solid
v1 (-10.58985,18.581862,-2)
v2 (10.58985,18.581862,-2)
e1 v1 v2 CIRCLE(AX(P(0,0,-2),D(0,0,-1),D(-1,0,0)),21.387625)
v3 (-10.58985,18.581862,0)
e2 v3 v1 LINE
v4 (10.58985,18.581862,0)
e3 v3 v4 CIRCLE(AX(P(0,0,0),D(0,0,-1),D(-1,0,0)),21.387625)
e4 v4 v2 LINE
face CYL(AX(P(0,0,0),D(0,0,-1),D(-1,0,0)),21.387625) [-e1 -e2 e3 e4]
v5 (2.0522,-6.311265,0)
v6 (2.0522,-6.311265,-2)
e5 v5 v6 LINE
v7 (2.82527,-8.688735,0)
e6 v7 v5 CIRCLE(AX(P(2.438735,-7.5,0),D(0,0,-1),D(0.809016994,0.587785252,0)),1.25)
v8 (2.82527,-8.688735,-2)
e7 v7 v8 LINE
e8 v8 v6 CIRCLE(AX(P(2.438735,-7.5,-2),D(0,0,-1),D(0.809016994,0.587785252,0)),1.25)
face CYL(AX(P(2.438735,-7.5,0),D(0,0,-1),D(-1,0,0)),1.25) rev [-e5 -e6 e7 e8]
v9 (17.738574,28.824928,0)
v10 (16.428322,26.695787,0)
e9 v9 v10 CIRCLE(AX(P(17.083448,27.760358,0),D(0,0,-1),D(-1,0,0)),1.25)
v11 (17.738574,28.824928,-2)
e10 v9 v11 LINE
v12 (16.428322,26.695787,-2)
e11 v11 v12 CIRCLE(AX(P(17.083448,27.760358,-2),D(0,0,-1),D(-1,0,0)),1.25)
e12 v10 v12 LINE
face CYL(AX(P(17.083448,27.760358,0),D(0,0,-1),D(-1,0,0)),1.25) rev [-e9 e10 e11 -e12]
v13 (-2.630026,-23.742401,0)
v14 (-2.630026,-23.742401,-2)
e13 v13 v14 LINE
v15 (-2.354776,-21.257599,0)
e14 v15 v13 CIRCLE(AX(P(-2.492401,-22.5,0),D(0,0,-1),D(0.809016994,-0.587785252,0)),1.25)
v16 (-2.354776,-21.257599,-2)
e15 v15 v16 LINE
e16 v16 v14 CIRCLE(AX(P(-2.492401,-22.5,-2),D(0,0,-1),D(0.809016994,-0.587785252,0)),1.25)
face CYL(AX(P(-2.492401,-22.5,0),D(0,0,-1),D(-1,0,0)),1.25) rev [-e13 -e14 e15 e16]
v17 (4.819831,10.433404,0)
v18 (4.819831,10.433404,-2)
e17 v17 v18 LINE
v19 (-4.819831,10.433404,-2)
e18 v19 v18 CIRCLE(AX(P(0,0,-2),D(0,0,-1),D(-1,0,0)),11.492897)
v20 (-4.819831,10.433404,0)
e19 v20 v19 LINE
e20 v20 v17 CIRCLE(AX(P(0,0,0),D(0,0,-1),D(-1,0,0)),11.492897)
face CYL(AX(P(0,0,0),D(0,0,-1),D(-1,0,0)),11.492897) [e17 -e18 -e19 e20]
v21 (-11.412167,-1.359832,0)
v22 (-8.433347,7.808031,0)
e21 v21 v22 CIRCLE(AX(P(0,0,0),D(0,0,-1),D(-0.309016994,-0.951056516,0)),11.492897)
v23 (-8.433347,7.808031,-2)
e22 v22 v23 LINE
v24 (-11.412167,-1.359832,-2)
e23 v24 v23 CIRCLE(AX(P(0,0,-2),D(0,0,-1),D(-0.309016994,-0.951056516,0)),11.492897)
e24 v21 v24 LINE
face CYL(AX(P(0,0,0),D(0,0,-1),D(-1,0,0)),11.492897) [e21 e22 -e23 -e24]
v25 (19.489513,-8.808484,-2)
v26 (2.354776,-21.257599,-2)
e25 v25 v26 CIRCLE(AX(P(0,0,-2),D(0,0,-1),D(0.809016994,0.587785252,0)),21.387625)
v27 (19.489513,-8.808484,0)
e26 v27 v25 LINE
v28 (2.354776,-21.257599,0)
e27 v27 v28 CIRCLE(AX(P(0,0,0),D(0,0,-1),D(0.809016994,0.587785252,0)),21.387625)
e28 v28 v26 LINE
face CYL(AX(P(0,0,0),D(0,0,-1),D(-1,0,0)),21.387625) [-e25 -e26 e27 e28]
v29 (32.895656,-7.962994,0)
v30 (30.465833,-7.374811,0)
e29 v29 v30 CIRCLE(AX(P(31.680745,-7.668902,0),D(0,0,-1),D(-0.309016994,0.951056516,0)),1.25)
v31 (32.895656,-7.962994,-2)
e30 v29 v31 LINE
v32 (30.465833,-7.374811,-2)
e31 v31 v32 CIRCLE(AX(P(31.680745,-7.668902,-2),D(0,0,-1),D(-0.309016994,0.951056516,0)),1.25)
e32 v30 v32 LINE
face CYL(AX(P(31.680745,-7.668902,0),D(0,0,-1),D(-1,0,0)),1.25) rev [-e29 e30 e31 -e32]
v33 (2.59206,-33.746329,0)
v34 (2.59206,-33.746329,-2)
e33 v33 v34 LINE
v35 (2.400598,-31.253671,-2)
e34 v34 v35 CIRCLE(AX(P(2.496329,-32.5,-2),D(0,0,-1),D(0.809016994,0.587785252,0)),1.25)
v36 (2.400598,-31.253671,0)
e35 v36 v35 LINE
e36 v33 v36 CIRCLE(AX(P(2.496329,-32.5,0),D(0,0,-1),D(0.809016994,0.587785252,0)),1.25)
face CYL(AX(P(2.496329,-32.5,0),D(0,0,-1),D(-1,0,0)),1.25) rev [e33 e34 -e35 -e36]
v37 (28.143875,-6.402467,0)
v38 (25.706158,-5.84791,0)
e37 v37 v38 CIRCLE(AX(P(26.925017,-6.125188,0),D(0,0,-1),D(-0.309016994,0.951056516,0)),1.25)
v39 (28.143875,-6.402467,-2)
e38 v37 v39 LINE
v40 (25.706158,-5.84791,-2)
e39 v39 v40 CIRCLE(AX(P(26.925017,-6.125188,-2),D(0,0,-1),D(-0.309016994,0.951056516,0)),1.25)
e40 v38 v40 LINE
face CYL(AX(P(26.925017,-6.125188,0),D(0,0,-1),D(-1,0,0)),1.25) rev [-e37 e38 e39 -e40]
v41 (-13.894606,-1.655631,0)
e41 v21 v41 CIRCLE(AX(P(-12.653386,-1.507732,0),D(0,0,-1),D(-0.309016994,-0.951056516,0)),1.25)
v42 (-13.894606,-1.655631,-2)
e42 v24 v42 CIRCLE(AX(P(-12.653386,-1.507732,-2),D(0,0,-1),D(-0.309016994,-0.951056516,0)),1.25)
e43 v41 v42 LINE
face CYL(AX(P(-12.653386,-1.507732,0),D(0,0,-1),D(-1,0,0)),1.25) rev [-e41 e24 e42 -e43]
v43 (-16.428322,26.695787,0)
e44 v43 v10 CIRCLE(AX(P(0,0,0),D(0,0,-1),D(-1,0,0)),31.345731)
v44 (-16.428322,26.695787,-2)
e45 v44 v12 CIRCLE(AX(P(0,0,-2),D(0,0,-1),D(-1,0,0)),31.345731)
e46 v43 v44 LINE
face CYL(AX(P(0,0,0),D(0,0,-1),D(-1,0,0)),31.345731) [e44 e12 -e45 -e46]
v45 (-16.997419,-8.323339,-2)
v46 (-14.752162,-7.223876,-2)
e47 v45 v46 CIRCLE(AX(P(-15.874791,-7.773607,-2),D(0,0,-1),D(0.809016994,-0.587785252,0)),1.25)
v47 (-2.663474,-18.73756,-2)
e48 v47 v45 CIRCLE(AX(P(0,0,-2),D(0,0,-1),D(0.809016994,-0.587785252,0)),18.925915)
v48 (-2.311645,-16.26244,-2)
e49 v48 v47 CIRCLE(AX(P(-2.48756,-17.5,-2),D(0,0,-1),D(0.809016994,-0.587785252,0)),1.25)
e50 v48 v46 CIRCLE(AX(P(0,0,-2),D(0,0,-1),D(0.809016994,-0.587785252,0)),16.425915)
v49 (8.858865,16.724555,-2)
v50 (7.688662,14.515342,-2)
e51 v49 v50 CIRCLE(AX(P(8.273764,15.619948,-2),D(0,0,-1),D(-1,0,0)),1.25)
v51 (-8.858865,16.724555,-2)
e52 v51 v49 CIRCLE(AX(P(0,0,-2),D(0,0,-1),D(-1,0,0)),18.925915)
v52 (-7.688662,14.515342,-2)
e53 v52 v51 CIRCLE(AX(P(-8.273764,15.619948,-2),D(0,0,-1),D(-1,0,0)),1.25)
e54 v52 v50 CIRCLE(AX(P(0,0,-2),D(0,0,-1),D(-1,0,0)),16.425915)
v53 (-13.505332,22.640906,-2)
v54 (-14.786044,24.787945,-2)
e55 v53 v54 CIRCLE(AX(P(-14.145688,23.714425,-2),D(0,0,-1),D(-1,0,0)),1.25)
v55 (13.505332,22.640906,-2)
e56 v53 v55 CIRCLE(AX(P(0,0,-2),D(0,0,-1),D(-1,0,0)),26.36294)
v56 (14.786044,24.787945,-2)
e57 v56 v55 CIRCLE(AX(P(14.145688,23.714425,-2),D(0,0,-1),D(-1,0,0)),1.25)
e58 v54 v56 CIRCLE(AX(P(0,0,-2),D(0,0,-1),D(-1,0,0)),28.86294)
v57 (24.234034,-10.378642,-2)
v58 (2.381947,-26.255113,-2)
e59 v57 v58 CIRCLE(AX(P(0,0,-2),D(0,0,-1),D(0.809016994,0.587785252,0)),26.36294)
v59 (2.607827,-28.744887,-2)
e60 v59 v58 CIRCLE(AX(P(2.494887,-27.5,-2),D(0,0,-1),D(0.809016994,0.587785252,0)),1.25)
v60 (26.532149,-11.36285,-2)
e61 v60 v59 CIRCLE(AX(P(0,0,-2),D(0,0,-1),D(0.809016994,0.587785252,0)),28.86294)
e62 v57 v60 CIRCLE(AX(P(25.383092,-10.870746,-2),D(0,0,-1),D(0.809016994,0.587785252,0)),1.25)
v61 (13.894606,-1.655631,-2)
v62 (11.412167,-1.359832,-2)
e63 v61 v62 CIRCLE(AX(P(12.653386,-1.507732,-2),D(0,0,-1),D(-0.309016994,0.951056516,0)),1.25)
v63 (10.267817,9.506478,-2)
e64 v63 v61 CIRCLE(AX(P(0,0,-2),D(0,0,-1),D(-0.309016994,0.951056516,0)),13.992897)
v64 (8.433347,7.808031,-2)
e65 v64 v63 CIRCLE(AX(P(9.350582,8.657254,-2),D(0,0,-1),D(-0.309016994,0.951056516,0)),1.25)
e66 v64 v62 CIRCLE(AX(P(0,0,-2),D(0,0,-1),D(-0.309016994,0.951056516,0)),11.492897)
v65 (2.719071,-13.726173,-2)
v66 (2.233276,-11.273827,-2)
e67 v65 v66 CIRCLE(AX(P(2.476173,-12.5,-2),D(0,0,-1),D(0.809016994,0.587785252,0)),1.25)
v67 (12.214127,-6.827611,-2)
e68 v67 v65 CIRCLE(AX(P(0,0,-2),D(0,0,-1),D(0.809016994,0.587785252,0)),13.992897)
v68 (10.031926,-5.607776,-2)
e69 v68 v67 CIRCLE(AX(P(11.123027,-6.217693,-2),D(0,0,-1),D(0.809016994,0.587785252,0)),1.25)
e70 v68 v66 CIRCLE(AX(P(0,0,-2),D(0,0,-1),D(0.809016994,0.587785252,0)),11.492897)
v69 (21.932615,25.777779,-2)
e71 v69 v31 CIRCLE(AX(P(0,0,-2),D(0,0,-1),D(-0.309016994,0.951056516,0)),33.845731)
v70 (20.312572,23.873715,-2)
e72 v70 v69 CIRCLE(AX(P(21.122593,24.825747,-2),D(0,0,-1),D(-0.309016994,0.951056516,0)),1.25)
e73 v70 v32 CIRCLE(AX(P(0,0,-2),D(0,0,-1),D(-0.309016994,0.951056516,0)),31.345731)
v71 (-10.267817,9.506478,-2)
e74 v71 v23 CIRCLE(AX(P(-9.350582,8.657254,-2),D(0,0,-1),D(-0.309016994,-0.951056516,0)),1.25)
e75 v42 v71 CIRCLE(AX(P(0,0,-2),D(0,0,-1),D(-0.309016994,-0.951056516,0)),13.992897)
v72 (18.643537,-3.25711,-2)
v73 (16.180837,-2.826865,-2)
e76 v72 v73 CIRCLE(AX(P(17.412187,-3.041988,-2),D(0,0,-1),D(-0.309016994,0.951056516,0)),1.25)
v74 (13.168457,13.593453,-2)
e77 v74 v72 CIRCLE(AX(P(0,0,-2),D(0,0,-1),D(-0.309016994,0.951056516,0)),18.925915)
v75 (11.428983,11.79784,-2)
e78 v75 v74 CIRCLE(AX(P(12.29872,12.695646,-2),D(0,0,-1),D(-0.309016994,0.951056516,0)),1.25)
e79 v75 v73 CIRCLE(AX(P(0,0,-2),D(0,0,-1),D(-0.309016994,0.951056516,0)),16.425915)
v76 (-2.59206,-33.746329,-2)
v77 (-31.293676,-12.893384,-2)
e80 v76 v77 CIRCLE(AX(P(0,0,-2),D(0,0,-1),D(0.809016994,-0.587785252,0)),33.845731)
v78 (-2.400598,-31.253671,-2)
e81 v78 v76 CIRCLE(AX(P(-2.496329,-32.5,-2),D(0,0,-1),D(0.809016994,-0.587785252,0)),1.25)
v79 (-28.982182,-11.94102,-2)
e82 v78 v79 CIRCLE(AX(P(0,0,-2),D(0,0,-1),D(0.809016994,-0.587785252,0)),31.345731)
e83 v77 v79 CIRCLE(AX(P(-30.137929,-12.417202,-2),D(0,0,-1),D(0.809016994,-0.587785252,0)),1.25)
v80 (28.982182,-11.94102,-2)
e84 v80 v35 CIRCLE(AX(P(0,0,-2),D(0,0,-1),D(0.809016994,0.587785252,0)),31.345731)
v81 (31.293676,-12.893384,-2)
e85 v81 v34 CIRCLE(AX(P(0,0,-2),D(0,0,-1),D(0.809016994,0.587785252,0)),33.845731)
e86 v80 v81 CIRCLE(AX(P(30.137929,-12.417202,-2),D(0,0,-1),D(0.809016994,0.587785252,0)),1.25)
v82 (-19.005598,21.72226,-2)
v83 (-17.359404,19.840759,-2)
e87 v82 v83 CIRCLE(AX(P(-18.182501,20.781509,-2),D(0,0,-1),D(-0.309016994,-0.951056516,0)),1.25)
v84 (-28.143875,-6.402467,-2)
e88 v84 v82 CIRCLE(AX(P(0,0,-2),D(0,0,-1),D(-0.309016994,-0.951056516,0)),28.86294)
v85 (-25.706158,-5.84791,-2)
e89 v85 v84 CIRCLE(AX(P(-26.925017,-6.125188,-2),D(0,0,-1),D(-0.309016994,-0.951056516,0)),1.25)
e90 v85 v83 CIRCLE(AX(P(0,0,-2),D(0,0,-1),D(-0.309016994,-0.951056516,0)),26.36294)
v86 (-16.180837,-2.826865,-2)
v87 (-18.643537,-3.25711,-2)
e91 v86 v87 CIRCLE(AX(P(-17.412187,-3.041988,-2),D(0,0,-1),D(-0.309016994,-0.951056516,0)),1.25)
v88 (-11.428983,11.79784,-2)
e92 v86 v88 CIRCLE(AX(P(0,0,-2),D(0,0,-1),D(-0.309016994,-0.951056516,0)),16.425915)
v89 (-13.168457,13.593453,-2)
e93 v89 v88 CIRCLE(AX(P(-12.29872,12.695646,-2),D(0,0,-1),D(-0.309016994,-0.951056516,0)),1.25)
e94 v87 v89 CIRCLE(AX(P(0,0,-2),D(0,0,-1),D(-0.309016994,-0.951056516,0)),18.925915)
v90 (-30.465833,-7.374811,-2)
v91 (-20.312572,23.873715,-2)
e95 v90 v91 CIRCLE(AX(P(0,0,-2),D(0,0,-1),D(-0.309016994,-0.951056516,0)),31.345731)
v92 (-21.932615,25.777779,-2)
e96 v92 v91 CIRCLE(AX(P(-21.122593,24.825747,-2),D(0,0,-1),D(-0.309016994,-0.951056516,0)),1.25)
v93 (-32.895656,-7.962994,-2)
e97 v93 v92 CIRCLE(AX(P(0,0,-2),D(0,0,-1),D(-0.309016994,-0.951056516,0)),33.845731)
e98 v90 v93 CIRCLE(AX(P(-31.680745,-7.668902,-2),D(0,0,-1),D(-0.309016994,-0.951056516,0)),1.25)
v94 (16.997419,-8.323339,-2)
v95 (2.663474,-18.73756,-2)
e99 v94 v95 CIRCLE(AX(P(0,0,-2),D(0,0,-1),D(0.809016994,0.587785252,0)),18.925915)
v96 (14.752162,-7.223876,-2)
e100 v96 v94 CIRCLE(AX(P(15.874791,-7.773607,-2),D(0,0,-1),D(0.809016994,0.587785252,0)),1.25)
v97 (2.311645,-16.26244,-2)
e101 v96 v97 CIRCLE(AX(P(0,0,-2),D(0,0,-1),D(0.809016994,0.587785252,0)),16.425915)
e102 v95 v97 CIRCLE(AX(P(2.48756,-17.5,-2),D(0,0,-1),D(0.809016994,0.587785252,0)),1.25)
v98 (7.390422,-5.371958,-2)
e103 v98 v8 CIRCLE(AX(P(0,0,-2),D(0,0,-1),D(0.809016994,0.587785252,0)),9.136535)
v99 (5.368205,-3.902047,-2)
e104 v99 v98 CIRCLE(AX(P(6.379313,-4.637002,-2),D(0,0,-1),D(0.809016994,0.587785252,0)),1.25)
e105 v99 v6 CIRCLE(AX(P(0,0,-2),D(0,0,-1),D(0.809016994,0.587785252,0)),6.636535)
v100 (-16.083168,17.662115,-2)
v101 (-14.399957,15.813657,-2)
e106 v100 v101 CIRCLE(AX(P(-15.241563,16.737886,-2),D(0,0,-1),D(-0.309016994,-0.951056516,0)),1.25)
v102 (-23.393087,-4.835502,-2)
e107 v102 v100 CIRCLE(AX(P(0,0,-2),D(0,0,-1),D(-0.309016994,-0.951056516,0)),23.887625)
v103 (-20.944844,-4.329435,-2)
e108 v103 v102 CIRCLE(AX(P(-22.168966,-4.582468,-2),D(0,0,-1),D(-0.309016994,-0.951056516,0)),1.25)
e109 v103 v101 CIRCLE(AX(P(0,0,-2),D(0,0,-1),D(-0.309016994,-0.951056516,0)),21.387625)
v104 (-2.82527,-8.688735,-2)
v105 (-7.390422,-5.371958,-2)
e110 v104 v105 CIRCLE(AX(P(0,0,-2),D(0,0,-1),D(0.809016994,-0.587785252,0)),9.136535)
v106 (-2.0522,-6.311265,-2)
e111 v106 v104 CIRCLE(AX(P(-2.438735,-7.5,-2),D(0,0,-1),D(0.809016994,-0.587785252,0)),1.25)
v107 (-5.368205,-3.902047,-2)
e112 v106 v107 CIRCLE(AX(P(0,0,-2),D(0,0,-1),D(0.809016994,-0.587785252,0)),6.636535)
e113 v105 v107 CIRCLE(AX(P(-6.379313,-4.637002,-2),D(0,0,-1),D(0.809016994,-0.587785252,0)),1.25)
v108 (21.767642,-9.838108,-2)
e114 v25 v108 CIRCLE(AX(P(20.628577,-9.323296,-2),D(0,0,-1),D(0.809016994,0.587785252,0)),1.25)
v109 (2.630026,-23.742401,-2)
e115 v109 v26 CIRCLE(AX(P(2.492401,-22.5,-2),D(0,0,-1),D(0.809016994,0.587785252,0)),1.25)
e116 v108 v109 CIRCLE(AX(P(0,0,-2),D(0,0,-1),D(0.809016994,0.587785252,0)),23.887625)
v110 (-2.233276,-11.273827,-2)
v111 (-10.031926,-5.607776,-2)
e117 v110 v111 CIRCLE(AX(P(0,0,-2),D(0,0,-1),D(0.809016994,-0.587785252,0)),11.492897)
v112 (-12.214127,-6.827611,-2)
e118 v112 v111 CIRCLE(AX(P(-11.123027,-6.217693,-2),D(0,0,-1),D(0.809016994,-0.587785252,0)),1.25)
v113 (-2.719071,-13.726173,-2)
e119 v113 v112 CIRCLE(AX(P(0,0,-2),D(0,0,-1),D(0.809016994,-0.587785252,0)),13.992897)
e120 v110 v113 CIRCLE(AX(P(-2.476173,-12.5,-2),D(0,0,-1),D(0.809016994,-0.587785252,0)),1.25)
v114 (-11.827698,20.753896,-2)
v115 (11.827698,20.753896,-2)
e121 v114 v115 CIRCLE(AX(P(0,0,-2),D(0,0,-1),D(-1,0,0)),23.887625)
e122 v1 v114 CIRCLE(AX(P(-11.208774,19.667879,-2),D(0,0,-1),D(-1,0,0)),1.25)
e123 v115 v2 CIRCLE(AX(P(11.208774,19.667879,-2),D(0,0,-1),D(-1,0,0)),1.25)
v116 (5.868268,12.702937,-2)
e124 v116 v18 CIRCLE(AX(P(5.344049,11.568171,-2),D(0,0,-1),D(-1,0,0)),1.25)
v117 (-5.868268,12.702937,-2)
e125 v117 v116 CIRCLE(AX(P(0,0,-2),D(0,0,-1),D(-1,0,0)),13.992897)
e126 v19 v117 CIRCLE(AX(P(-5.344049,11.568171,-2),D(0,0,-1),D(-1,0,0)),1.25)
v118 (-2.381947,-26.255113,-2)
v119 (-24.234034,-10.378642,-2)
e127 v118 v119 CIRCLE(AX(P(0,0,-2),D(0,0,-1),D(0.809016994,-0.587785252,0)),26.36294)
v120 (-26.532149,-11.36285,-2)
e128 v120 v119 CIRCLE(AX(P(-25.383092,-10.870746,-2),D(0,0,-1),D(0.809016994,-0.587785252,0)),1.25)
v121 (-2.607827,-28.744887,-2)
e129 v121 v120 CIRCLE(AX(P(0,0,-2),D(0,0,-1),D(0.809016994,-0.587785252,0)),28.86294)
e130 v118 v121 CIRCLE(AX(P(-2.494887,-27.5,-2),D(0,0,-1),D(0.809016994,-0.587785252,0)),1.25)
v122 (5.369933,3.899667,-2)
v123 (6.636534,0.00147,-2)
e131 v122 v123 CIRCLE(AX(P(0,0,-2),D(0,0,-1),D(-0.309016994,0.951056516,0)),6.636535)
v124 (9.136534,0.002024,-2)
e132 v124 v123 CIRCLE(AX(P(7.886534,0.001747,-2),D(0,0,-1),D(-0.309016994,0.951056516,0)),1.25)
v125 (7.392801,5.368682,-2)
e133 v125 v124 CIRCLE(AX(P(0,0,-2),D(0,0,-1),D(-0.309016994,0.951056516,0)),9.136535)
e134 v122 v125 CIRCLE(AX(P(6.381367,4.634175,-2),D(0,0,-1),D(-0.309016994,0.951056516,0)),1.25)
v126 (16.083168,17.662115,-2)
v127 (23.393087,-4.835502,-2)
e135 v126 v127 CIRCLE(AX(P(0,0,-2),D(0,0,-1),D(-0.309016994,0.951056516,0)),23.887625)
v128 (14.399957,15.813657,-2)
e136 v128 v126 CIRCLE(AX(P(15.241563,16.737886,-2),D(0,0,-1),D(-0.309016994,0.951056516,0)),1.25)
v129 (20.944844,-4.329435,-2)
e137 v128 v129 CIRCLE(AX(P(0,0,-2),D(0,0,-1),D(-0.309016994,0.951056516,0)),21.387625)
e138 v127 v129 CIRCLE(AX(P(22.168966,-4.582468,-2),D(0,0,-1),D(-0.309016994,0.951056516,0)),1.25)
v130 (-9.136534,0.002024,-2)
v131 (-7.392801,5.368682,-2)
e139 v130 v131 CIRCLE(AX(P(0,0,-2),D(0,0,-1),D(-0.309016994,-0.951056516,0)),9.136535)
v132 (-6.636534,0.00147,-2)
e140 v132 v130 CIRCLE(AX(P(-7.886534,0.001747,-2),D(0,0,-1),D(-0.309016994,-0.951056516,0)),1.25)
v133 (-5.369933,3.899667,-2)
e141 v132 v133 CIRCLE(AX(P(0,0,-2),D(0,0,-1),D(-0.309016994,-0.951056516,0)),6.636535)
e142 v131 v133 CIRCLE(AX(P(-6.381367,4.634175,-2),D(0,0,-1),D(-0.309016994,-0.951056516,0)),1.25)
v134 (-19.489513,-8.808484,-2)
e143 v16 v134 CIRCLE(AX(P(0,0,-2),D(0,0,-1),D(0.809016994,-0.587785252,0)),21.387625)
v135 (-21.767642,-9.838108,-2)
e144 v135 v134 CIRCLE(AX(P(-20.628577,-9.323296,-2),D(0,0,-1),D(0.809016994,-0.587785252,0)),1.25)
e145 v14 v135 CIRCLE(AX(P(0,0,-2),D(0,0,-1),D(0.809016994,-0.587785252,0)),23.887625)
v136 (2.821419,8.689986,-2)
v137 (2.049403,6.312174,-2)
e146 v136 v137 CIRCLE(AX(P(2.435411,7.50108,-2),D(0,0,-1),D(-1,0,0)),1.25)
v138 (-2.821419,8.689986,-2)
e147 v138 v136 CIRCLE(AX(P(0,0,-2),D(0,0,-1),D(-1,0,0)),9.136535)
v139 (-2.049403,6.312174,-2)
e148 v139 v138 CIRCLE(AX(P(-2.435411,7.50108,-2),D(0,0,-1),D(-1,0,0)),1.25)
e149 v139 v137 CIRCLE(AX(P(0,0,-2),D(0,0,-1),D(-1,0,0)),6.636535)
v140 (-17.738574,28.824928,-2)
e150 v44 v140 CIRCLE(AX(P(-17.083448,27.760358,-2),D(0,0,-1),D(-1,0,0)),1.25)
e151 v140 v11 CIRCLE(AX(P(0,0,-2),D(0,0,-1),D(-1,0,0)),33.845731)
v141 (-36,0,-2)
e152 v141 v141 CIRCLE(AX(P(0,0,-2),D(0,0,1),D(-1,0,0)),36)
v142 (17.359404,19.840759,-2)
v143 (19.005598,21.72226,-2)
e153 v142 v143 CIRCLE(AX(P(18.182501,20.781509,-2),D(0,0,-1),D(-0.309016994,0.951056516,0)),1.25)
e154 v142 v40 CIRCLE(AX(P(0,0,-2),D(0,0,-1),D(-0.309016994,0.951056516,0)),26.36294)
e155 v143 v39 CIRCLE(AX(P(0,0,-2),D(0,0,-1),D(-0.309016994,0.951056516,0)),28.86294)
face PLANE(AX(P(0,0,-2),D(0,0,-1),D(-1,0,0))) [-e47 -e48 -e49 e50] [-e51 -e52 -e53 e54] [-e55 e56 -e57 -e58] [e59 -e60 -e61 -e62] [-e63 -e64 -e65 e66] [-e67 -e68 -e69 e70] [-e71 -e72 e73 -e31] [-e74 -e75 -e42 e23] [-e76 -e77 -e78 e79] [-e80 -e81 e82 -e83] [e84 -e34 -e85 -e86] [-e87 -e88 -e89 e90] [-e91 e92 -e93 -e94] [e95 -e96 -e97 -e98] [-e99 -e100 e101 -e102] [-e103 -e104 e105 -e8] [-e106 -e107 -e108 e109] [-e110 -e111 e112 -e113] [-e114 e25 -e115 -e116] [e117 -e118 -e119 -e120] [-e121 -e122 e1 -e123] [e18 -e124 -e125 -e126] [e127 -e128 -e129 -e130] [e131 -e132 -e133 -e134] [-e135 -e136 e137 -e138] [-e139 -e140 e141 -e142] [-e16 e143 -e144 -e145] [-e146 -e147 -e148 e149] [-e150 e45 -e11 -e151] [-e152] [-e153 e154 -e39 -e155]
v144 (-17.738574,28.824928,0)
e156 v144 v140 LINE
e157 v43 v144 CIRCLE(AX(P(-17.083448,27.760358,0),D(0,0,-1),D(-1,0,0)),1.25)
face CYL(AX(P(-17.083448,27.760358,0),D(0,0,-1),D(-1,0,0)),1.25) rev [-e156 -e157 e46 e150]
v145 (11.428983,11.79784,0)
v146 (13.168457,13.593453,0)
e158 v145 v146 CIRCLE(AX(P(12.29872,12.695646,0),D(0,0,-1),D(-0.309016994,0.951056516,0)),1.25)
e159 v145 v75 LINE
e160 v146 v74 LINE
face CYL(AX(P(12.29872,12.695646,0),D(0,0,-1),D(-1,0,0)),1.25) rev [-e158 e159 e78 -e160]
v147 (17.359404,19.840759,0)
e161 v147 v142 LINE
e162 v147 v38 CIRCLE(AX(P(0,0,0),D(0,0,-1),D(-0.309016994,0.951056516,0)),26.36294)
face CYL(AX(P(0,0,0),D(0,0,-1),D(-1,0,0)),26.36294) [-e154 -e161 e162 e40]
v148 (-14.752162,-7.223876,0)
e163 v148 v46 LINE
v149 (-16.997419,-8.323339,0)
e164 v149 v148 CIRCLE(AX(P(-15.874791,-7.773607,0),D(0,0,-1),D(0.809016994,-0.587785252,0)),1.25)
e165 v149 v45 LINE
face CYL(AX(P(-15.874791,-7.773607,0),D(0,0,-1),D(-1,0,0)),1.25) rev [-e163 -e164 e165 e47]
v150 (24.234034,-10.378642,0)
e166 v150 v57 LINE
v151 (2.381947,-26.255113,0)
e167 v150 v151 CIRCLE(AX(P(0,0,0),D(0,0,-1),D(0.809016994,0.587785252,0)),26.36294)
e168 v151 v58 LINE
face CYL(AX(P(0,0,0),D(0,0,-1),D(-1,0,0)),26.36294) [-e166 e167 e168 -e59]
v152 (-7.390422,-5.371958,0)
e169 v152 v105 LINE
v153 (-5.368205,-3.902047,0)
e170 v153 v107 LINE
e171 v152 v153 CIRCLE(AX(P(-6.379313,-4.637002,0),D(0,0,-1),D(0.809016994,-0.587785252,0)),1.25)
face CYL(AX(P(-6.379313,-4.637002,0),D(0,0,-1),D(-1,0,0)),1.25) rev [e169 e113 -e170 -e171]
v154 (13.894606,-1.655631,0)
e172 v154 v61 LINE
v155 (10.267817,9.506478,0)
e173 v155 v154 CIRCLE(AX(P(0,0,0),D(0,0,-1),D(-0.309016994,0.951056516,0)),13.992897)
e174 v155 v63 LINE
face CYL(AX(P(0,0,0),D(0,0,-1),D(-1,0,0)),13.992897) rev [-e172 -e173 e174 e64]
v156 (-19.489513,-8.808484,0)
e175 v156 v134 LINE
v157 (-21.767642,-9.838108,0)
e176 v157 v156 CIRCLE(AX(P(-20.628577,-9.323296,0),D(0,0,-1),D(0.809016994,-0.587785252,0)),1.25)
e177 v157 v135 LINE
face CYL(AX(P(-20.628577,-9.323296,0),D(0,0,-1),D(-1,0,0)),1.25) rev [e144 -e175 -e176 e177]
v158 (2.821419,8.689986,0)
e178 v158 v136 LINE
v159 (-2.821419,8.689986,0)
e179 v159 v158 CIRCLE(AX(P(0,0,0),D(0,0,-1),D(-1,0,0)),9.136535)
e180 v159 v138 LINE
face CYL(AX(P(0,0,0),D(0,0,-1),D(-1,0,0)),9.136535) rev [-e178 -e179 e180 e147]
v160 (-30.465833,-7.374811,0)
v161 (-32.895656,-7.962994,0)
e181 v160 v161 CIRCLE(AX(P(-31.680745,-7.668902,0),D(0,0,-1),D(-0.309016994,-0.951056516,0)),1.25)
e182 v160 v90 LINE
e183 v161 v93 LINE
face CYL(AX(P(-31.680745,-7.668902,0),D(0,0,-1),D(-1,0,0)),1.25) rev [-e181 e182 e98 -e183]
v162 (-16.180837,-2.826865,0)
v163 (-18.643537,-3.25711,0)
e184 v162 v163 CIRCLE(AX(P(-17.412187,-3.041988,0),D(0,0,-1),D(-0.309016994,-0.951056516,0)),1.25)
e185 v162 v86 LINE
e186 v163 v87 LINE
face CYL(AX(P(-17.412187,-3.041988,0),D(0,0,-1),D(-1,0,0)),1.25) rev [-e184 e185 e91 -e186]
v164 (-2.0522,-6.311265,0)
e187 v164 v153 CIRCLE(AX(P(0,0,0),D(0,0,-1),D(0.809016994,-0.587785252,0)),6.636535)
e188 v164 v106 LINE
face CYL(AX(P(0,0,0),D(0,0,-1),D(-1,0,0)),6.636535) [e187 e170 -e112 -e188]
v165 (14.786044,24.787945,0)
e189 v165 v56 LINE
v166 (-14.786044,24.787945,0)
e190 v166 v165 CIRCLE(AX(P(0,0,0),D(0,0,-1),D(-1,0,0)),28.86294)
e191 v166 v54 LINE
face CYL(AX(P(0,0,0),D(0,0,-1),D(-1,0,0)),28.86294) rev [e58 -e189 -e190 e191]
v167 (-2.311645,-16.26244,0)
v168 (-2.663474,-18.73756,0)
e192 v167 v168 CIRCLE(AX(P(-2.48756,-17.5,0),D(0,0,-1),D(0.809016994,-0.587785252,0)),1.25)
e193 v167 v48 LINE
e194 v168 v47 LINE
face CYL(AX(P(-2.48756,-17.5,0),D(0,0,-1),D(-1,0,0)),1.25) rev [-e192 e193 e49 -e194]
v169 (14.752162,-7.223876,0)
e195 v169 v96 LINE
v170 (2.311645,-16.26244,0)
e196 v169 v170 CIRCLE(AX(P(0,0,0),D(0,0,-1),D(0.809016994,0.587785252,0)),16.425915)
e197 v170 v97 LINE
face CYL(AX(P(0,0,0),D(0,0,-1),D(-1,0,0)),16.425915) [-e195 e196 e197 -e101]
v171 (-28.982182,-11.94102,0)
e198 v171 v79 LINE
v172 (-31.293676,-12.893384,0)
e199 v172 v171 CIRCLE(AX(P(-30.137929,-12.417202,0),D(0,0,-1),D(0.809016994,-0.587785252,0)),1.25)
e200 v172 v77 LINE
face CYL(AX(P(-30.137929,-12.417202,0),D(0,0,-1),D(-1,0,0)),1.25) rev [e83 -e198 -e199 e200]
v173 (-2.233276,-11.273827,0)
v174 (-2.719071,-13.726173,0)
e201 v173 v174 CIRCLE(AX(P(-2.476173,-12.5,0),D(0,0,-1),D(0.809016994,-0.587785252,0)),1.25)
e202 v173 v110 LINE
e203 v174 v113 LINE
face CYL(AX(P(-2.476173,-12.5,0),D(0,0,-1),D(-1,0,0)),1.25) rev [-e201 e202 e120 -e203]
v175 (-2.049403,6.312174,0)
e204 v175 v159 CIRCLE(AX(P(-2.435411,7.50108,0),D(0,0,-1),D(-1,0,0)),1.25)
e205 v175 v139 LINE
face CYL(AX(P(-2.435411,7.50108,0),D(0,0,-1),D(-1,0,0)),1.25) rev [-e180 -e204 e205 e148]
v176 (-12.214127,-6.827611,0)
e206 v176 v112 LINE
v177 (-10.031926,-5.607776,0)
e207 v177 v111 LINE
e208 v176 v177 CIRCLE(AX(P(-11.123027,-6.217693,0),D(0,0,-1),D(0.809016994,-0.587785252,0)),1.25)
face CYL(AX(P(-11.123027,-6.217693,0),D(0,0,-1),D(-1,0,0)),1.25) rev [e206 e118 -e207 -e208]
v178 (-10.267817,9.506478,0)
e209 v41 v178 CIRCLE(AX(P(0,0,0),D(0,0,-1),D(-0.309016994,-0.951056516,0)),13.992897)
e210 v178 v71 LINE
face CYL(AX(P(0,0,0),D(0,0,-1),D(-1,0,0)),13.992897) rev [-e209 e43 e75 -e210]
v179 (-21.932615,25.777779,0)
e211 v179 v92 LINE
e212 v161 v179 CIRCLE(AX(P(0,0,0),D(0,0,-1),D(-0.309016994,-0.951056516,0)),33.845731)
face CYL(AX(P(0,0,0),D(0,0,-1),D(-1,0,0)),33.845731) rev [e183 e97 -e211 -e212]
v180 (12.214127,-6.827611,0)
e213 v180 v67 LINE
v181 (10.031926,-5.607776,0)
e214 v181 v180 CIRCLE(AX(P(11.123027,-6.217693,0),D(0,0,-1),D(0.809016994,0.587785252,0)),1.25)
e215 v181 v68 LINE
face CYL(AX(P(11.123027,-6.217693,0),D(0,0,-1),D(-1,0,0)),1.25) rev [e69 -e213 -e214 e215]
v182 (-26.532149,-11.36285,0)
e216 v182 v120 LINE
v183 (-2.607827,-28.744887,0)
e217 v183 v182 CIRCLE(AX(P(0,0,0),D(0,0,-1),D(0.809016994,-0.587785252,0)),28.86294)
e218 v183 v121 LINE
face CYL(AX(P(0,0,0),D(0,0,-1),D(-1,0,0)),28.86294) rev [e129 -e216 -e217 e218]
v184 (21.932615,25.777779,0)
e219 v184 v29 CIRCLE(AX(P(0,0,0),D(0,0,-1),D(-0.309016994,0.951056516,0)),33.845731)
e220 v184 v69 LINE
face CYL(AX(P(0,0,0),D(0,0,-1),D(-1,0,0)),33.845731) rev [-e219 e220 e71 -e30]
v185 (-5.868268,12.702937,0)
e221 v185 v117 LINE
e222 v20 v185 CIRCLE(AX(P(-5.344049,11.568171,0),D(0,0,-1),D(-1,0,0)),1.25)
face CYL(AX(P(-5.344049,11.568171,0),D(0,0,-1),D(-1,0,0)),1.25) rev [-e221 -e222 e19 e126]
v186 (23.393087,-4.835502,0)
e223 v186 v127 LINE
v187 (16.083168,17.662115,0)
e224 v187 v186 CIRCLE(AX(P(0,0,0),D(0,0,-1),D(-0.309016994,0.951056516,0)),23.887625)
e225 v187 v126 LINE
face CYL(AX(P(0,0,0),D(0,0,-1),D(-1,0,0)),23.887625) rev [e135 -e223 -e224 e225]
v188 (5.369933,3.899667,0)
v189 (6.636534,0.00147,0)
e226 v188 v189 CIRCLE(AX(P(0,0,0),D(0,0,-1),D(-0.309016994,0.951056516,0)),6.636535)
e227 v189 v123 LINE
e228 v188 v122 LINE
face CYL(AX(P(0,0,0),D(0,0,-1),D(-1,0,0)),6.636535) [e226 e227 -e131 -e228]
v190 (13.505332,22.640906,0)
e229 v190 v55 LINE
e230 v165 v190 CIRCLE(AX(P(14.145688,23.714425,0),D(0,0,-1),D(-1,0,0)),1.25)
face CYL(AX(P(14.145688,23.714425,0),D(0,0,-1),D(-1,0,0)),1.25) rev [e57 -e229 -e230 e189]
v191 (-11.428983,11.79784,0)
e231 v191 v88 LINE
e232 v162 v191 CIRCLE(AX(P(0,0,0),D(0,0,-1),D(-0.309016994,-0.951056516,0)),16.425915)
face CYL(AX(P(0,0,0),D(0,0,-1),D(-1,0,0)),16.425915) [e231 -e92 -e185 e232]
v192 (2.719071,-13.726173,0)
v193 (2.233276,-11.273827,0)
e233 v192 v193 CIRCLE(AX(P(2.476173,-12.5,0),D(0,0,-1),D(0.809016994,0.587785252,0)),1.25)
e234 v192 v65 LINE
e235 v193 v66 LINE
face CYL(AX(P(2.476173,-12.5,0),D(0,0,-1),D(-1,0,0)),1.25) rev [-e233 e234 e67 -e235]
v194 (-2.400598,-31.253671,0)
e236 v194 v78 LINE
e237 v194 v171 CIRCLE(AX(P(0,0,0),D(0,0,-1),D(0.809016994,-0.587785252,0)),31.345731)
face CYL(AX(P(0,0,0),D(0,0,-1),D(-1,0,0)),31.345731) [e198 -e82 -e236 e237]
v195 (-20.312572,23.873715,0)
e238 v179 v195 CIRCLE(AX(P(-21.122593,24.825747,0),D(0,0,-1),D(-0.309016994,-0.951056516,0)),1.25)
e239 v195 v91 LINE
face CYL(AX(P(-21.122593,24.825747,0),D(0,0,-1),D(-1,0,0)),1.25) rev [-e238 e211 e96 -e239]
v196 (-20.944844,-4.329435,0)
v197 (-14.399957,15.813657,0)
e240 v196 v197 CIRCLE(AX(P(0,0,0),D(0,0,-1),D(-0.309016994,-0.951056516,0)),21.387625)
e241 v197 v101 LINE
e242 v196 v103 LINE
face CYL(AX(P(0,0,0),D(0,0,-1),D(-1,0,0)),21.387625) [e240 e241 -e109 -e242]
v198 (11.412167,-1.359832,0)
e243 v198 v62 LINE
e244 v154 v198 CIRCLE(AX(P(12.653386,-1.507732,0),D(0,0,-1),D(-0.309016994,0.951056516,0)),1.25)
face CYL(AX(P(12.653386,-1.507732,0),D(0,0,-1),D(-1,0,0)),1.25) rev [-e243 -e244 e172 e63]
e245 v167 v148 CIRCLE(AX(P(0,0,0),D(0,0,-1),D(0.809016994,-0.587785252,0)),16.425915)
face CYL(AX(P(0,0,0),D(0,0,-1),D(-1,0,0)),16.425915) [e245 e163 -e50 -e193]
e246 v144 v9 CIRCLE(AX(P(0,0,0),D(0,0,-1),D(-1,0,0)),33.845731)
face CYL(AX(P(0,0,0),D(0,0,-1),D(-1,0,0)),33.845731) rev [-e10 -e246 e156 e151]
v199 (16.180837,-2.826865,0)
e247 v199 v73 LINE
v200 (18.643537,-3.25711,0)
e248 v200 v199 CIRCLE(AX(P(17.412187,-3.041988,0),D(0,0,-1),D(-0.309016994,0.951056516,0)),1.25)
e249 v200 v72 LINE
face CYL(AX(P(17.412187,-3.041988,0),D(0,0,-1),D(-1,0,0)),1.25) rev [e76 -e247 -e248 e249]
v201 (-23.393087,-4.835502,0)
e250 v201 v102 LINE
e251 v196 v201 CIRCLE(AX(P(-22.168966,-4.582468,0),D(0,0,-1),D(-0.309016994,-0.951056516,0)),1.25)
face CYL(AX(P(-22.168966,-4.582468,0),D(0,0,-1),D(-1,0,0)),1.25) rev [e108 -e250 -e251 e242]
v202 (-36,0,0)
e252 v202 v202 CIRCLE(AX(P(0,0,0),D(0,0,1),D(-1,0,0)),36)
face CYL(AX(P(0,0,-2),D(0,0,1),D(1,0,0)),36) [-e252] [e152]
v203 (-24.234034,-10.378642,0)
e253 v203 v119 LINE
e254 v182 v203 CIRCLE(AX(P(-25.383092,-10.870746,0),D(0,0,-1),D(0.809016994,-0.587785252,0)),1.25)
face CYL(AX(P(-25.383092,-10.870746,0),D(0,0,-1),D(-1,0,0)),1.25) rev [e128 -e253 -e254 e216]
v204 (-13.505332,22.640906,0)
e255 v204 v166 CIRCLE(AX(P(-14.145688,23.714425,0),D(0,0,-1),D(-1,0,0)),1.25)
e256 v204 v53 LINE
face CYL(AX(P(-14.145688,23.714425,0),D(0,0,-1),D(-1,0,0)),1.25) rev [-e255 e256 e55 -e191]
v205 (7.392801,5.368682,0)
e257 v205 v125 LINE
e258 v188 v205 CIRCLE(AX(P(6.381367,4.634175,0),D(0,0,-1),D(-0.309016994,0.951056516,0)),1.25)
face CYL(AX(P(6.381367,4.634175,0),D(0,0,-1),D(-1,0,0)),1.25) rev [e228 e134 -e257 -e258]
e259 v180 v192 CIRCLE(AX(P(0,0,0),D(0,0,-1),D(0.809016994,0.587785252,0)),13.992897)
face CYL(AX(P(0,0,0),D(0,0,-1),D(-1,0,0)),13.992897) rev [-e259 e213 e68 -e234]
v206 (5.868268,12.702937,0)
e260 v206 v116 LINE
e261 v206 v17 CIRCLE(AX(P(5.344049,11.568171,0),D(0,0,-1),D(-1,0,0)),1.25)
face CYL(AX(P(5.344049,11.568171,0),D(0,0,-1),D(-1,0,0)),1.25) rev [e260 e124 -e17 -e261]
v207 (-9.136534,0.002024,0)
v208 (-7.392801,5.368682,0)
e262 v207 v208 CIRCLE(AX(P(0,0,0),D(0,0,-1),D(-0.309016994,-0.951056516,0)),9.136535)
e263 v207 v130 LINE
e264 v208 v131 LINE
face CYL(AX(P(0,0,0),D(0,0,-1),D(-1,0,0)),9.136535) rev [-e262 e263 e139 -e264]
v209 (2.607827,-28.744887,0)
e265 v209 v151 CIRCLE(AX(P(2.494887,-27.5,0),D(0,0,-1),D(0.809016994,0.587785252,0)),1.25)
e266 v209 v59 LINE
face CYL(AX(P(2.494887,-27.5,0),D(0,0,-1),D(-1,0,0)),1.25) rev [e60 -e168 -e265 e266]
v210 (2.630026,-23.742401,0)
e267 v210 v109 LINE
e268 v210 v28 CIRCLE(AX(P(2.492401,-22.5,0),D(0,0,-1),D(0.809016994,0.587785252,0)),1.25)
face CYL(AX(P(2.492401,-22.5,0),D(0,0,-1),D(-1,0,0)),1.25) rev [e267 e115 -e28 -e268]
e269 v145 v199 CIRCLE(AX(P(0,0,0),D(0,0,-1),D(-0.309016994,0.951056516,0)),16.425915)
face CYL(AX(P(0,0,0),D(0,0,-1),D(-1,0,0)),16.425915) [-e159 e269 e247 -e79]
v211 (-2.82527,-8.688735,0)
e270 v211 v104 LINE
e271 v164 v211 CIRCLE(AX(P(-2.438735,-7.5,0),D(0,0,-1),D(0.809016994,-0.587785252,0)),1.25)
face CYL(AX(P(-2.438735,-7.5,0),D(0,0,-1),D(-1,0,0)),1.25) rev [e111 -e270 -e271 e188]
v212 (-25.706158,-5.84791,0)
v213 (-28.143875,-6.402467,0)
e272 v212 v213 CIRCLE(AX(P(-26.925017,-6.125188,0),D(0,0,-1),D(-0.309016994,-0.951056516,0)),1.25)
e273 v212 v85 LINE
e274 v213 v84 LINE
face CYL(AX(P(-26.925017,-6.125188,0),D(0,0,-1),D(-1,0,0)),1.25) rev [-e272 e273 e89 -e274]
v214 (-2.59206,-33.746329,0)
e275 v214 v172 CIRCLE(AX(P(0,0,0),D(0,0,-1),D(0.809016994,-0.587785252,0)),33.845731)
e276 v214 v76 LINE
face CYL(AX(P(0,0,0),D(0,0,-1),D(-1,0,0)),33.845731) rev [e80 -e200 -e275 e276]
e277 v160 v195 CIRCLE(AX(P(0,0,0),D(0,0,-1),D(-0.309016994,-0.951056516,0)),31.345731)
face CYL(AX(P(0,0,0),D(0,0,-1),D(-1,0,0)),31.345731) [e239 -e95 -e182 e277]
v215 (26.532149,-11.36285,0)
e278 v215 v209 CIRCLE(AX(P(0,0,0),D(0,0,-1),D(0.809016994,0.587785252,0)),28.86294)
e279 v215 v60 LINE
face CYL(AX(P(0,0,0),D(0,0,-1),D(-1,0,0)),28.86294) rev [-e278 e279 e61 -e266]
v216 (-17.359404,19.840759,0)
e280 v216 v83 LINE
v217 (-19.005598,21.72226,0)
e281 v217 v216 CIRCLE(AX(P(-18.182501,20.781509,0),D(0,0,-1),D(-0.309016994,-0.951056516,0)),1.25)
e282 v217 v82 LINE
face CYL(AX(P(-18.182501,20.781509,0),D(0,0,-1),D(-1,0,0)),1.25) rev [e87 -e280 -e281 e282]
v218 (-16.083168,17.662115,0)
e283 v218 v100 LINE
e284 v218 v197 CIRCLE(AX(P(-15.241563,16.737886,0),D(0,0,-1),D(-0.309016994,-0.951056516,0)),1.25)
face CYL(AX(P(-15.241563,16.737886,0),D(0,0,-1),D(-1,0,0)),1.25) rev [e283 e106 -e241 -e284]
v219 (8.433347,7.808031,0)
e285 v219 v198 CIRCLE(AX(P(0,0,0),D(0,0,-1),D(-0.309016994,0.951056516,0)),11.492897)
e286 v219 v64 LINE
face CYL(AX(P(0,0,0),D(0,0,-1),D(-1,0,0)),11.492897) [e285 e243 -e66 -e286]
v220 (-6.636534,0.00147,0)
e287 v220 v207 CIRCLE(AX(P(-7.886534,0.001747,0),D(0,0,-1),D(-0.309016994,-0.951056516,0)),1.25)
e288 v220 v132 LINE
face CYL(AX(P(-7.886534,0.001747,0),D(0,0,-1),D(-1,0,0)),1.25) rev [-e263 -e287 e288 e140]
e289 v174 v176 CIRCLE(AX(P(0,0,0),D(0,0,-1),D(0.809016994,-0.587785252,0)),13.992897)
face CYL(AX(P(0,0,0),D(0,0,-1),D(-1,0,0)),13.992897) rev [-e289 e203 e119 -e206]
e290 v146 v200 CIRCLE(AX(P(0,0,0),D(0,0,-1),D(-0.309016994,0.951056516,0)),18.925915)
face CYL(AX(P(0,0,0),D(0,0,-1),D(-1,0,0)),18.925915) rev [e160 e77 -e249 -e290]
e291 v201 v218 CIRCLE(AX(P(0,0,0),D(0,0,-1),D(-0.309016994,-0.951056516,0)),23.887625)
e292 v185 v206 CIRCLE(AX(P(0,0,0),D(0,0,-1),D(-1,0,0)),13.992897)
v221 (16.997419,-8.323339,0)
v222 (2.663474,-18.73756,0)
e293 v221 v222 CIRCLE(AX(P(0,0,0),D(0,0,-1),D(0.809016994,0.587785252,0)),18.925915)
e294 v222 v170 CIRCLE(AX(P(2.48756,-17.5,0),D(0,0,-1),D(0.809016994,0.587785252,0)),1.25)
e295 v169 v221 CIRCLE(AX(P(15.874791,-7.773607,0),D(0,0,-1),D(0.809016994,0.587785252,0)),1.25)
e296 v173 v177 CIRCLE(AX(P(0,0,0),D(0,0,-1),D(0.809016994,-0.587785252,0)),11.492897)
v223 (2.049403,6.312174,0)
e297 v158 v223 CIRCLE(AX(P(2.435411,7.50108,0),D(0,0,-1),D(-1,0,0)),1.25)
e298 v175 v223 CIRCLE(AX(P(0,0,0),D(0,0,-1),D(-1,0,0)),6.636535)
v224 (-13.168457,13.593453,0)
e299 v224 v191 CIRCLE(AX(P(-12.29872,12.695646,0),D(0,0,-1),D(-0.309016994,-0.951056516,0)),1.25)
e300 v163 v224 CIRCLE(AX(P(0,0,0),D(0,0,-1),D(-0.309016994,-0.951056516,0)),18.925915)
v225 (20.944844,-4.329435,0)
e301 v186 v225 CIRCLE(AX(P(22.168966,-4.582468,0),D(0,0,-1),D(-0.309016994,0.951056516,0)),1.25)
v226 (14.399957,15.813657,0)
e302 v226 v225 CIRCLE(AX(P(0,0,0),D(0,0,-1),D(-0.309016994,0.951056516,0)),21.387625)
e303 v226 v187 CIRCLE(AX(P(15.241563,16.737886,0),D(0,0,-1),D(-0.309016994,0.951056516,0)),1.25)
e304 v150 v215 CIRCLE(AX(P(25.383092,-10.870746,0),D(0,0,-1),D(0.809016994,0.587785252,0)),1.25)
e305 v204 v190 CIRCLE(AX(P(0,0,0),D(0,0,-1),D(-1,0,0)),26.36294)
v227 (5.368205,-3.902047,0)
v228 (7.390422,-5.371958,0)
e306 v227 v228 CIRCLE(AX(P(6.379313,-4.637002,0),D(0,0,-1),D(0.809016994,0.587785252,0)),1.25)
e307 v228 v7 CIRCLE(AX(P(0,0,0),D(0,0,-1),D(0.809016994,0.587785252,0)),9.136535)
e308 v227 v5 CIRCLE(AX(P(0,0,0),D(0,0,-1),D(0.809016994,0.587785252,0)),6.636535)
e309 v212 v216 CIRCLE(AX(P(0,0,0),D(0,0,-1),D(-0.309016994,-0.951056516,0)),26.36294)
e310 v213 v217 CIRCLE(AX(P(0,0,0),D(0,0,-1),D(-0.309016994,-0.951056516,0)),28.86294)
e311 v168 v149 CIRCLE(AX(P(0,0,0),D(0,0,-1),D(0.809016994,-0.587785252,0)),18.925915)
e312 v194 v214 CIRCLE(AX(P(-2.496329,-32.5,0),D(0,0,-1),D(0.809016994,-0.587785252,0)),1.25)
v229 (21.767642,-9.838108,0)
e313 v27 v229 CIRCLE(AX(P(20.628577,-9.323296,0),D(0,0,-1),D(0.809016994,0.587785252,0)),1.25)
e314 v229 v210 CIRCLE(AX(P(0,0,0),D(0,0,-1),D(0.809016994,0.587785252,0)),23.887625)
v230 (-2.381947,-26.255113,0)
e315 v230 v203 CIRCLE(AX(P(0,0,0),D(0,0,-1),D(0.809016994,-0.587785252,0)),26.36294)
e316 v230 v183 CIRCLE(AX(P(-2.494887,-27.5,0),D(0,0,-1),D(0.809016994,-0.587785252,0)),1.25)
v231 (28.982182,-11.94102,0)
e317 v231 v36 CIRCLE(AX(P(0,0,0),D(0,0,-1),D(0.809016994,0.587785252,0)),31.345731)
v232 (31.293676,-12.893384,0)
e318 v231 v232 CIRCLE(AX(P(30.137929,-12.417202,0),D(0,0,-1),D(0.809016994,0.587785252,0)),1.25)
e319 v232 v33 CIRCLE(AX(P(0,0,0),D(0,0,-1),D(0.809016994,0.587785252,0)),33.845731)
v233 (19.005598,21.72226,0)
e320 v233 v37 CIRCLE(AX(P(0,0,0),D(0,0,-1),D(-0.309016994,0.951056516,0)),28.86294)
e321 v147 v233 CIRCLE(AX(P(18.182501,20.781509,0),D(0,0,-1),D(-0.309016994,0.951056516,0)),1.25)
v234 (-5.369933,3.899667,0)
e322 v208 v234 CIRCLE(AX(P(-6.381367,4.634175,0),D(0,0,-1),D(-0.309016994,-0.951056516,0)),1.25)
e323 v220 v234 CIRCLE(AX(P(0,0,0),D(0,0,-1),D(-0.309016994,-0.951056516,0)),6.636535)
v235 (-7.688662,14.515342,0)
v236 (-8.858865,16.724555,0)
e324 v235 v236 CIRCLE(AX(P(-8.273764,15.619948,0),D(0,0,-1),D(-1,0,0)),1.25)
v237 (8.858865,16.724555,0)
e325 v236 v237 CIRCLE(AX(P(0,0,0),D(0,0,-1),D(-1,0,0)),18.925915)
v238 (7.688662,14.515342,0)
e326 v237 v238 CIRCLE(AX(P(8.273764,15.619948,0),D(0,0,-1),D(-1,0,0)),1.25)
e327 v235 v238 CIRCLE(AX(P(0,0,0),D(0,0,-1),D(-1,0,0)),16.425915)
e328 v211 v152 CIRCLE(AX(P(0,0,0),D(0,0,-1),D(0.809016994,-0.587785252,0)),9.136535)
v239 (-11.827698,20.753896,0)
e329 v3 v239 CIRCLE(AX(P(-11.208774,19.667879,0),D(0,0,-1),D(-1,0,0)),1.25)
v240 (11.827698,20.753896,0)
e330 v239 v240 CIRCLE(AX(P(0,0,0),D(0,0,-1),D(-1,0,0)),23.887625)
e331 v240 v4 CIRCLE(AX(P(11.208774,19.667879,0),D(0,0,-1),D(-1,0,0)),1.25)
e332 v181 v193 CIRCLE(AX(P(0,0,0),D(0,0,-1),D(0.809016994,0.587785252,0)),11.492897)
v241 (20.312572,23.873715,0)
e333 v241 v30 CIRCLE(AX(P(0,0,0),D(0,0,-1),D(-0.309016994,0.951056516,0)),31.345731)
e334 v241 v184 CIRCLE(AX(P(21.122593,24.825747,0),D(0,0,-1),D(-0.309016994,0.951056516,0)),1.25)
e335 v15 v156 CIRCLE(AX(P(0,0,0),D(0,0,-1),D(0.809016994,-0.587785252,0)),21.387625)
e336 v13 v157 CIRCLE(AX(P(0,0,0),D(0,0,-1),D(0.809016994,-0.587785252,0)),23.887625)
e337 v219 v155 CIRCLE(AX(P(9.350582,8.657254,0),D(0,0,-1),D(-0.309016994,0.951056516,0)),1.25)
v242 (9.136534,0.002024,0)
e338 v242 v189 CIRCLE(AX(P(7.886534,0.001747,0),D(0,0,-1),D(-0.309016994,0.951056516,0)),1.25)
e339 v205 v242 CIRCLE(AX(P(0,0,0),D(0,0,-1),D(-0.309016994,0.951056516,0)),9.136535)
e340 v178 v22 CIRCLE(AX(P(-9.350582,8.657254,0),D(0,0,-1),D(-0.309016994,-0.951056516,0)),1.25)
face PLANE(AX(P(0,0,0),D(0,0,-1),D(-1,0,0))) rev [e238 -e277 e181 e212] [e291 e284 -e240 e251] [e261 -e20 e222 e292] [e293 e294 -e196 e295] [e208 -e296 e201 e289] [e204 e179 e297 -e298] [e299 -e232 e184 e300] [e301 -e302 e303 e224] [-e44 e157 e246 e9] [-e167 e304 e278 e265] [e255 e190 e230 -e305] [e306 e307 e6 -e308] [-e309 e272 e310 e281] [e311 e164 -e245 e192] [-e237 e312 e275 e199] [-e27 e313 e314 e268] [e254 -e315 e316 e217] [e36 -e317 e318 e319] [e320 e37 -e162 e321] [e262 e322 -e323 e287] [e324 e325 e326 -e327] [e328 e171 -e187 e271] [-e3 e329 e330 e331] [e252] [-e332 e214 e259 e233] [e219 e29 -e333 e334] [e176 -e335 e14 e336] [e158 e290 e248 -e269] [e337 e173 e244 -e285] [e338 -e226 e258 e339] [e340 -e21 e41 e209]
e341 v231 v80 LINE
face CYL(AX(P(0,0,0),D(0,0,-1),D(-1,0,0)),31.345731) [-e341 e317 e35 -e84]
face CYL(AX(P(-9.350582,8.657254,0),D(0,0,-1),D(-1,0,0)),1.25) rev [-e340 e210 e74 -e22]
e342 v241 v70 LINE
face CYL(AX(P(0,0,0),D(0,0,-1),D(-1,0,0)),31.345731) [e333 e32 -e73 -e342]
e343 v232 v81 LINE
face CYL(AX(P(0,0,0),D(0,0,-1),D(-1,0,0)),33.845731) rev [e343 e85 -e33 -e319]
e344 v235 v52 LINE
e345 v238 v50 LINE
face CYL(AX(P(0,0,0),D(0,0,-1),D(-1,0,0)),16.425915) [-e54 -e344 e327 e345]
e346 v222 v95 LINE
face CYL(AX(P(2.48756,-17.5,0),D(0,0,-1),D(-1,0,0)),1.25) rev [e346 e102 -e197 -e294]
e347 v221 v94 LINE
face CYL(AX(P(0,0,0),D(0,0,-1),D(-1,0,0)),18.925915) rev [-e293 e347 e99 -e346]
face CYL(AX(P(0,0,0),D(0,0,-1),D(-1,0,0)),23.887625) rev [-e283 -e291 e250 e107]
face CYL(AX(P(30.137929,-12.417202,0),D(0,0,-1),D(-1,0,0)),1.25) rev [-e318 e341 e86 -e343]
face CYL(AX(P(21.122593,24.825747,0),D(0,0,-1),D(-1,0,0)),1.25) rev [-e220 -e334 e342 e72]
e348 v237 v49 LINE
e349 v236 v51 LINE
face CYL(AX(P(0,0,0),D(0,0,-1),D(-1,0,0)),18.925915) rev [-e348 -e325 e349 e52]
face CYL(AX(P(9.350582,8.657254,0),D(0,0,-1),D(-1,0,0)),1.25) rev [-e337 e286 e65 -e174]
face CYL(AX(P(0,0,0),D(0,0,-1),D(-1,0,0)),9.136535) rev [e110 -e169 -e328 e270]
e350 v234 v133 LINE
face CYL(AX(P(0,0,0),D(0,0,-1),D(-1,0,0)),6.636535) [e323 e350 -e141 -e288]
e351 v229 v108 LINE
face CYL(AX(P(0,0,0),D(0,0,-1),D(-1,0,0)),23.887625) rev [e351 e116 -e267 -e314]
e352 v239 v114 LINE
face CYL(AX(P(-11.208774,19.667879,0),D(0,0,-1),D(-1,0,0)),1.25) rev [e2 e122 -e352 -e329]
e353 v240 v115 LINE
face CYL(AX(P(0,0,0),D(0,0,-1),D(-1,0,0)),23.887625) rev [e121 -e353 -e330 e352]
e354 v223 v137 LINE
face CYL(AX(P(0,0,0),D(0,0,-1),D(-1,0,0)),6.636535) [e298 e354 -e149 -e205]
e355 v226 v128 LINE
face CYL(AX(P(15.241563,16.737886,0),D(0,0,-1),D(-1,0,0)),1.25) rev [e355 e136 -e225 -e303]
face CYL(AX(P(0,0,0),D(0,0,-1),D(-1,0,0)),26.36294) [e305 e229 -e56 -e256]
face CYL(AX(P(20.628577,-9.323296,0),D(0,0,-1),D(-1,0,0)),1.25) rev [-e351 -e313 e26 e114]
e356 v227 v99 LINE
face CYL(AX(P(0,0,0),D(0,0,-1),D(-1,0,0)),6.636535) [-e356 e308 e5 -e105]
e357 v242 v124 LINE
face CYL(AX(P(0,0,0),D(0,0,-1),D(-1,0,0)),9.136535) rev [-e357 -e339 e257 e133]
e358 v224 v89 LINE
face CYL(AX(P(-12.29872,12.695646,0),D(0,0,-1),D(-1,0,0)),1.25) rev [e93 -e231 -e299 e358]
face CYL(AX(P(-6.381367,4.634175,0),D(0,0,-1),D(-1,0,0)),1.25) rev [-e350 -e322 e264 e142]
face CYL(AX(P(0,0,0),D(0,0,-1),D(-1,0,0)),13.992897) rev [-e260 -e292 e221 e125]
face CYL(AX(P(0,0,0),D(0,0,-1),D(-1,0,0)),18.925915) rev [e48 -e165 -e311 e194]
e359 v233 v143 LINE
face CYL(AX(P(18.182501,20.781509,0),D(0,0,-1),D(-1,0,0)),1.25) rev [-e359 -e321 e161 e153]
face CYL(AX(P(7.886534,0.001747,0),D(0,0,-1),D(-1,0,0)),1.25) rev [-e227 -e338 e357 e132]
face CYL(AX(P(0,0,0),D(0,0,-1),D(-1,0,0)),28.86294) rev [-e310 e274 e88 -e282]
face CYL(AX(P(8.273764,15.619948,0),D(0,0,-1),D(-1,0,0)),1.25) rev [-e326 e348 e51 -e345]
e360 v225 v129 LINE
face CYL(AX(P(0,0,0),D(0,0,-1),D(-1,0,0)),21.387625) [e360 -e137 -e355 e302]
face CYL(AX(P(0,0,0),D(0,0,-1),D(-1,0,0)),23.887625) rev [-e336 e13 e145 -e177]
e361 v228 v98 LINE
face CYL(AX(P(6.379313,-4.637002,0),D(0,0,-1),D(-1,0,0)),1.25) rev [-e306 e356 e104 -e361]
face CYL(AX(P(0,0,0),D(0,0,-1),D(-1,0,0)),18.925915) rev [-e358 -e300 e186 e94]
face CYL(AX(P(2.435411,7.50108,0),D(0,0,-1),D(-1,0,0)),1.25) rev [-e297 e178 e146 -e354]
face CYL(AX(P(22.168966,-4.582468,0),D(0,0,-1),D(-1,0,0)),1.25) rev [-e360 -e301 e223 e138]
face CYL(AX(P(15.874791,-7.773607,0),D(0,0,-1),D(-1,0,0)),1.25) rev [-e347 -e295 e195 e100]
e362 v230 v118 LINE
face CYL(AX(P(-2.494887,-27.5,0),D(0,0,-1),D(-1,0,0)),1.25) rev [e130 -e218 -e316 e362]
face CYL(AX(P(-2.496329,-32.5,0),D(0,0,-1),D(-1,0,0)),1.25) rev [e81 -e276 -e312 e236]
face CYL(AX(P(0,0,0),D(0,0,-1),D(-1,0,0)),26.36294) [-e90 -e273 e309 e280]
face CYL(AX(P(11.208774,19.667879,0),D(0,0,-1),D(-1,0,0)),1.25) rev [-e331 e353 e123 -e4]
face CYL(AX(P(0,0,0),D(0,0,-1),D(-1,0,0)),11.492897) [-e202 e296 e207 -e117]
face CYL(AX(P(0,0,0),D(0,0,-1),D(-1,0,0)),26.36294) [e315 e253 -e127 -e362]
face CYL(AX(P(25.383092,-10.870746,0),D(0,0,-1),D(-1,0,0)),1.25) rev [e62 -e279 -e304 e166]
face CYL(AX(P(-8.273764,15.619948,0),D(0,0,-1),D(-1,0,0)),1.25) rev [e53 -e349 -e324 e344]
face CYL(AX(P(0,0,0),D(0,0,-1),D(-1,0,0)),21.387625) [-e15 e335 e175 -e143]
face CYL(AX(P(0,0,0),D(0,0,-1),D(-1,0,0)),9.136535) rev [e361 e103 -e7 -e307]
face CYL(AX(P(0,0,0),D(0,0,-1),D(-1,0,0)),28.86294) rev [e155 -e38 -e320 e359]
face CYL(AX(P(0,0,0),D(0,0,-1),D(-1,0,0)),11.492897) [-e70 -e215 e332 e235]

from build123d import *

# Parameters (mm, degrees)
EXTRUDE_1_DEPTH          = 2
CUT_EXTRUDE_1_DEPTH      = 2
PATTERN_START            = -2
PATTERN_LINEAR_1_DEPTH   = 2
PATTERN_CIRCULAR_2_COUNT = 5


# Read off the part's stored shape, not the designer's step: Линейный массив1
with BuildPart() as part:
    # Эскиз1 → Бобышка-Вытянуть1 (new body)
    with BuildSketch(Plane.XY):
        with BuildLine():
            Line((-21.160269083, 29.124611797), (0, 0))
            Line((0, 0), (21.160269083, 29.124611797))
            ThreePointArc((21.160269083, 29.124611797), (0, 36), (-21.160269083, 29.124611797))
        make_face()
    extrude_1 = extrude(amount=-EXTRUDE_1_DEPTH)

    # Эскиз3 → Вырез-Вытянуть1 (cut)
    with BuildSketch(Plane(origin=(0, 0, -2), x_dir=(-1, 0, 0), z_dir=(0, 0, -1))):
        with BuildLine():
            ThreePointArc((2.821419138, 8.689986144), (0, 9.136534635), (-2.821419138, 8.689986144))
            ThreePointArc((-2.821419138, 8.689986144), (-3.624317507, 7.115072112), (-2.049403475, 6.312173743))
            ThreePointArc((-2.049403475, 6.312173743), (0, 6.636534635), (2.049403475, 6.312173743))
            ThreePointArc((2.049403475, 6.312173743), (3.624317507, 7.115072112), (2.821419138, 8.689986144))
        make_face()
    cut_extrude_1 = extrude(amount=-CUT_EXTRUDE_1_DEPTH, mode=Mode.SUBTRACT)

    # Линейный массив1 outline → Линейный массив1 (cut)
    with BuildSketch(Plane.XY.offset(PATTERN_START)):
        with BuildLine():
            ThreePointArc((-5.868267845, 12.702937061), (-6.478815917, 11.043952114), (-4.81983097, 10.433404043))
            ThreePointArc((-4.81983097, 10.433404043), (0, 11.492897394), (4.81983097, 10.433404043))
            ThreePointArc((4.81983097, 10.433404043), (6.478815917, 11.043952114), (5.868267845, 12.702937061))
            ThreePointArc((5.868267845, 12.702937061), (0, 13.992897394), (-5.868267845, 12.702937061))
        make_face()
        with BuildLine():
            ThreePointArc((-14.786044108, 24.78794491), (-15.219207741, 23.074069399), (-13.50533223, 22.640905767))
            ThreePointArc((-13.50533223, 22.640905767), (0, 26.362940135), (13.50533223, 22.640905767))
            ThreePointArc((13.50533223, 22.640905767), (15.219207741, 23.074069399), (14.786044108, 24.78794491))
            ThreePointArc((14.786044108, 24.78794491), (0, 28.862940135), (-14.786044108, 24.78794491))
        make_face()
        with BuildLine():
            ThreePointArc((-17.738574213, 28.824927916), (-18.148018532, 27.10523162), (-16.428322236, 26.695787302))
            ThreePointArc((-16.428322236, 26.695787302), (0, 31.345730668), (16.428322236, 26.695787302))
            ThreePointArc((16.428322236, 26.695787302), (18.148018532, 27.10523162), (17.738574213, 28.824927916))
            ThreePointArc((17.738574213, 28.824927916), (0, 33.845730668), (-17.738574213, 28.824927916))
        make_face()
        with BuildLine():
            ThreePointArc((-8.858865357, 16.724555129), (-9.378370621, 15.034846787), (-7.688662279, 14.515341523))
            ThreePointArc((-7.688662279, 14.515341523), (0, 16.4259145), (7.688662279, 14.515341523))
            ThreePointArc((7.688662279, 14.515341523), (9.378370621, 15.034846787), (8.858865357, 16.724555129))
            ThreePointArc((8.858865357, 16.724555129), (0, 18.9259145), (-8.858865357, 16.724555129))
        make_face()
        with BuildLine():
            ThreePointArc((-11.827697591, 20.75389585), (-12.294790819, 19.04895482), (-10.589849789, 18.581861592))
            ThreePointArc((-10.589849789, 18.581861592), (0, 21.387624898), (10.589849789, 18.581861592))
            ThreePointArc((10.589849789, 18.581861592), (12.294790819, 19.04895482), (11.827697591, 20.75389585))
            ThreePointArc((11.827697591, 20.75389585), (0, 23.887624898), (-11.827697591, 20.75389585))
        make_face()
    pattern_linear_1 = extrude(amount=PATTERN_LINEAR_1_DEPTH, mode=Mode.SUBTRACT)

    # Круговой массив2: Бобышка-Вытянуть1, Вырез-Вытянуть1, Линейный массив1 ×5 about axis
    pattern_circular_2_axis = Axis((0, 0, 0), (0, 0, 1))
    add([extrude_1.rotate(pattern_circular_2_axis, i * 360 / PATTERN_CIRCULAR_2_COUNT) for i in range(1, PATTERN_CIRCULAR_2_COUNT)])
    add([cut_extrude_1.rotate(pattern_circular_2_axis, i * 360 / PATTERN_CIRCULAR_2_COUNT) for i in range(1, PATTERN_CIRCULAR_2_COUNT)], mode=Mode.SUBTRACT)
    add([pattern_linear_1.rotate(pattern_circular_2_axis, i * 360 / PATTERN_CIRCULAR_2_COUNT) for i in range(1, PATTERN_CIRCULAR_2_COUNT)], mode=Mode.SUBTRACT)


solid = part.part
